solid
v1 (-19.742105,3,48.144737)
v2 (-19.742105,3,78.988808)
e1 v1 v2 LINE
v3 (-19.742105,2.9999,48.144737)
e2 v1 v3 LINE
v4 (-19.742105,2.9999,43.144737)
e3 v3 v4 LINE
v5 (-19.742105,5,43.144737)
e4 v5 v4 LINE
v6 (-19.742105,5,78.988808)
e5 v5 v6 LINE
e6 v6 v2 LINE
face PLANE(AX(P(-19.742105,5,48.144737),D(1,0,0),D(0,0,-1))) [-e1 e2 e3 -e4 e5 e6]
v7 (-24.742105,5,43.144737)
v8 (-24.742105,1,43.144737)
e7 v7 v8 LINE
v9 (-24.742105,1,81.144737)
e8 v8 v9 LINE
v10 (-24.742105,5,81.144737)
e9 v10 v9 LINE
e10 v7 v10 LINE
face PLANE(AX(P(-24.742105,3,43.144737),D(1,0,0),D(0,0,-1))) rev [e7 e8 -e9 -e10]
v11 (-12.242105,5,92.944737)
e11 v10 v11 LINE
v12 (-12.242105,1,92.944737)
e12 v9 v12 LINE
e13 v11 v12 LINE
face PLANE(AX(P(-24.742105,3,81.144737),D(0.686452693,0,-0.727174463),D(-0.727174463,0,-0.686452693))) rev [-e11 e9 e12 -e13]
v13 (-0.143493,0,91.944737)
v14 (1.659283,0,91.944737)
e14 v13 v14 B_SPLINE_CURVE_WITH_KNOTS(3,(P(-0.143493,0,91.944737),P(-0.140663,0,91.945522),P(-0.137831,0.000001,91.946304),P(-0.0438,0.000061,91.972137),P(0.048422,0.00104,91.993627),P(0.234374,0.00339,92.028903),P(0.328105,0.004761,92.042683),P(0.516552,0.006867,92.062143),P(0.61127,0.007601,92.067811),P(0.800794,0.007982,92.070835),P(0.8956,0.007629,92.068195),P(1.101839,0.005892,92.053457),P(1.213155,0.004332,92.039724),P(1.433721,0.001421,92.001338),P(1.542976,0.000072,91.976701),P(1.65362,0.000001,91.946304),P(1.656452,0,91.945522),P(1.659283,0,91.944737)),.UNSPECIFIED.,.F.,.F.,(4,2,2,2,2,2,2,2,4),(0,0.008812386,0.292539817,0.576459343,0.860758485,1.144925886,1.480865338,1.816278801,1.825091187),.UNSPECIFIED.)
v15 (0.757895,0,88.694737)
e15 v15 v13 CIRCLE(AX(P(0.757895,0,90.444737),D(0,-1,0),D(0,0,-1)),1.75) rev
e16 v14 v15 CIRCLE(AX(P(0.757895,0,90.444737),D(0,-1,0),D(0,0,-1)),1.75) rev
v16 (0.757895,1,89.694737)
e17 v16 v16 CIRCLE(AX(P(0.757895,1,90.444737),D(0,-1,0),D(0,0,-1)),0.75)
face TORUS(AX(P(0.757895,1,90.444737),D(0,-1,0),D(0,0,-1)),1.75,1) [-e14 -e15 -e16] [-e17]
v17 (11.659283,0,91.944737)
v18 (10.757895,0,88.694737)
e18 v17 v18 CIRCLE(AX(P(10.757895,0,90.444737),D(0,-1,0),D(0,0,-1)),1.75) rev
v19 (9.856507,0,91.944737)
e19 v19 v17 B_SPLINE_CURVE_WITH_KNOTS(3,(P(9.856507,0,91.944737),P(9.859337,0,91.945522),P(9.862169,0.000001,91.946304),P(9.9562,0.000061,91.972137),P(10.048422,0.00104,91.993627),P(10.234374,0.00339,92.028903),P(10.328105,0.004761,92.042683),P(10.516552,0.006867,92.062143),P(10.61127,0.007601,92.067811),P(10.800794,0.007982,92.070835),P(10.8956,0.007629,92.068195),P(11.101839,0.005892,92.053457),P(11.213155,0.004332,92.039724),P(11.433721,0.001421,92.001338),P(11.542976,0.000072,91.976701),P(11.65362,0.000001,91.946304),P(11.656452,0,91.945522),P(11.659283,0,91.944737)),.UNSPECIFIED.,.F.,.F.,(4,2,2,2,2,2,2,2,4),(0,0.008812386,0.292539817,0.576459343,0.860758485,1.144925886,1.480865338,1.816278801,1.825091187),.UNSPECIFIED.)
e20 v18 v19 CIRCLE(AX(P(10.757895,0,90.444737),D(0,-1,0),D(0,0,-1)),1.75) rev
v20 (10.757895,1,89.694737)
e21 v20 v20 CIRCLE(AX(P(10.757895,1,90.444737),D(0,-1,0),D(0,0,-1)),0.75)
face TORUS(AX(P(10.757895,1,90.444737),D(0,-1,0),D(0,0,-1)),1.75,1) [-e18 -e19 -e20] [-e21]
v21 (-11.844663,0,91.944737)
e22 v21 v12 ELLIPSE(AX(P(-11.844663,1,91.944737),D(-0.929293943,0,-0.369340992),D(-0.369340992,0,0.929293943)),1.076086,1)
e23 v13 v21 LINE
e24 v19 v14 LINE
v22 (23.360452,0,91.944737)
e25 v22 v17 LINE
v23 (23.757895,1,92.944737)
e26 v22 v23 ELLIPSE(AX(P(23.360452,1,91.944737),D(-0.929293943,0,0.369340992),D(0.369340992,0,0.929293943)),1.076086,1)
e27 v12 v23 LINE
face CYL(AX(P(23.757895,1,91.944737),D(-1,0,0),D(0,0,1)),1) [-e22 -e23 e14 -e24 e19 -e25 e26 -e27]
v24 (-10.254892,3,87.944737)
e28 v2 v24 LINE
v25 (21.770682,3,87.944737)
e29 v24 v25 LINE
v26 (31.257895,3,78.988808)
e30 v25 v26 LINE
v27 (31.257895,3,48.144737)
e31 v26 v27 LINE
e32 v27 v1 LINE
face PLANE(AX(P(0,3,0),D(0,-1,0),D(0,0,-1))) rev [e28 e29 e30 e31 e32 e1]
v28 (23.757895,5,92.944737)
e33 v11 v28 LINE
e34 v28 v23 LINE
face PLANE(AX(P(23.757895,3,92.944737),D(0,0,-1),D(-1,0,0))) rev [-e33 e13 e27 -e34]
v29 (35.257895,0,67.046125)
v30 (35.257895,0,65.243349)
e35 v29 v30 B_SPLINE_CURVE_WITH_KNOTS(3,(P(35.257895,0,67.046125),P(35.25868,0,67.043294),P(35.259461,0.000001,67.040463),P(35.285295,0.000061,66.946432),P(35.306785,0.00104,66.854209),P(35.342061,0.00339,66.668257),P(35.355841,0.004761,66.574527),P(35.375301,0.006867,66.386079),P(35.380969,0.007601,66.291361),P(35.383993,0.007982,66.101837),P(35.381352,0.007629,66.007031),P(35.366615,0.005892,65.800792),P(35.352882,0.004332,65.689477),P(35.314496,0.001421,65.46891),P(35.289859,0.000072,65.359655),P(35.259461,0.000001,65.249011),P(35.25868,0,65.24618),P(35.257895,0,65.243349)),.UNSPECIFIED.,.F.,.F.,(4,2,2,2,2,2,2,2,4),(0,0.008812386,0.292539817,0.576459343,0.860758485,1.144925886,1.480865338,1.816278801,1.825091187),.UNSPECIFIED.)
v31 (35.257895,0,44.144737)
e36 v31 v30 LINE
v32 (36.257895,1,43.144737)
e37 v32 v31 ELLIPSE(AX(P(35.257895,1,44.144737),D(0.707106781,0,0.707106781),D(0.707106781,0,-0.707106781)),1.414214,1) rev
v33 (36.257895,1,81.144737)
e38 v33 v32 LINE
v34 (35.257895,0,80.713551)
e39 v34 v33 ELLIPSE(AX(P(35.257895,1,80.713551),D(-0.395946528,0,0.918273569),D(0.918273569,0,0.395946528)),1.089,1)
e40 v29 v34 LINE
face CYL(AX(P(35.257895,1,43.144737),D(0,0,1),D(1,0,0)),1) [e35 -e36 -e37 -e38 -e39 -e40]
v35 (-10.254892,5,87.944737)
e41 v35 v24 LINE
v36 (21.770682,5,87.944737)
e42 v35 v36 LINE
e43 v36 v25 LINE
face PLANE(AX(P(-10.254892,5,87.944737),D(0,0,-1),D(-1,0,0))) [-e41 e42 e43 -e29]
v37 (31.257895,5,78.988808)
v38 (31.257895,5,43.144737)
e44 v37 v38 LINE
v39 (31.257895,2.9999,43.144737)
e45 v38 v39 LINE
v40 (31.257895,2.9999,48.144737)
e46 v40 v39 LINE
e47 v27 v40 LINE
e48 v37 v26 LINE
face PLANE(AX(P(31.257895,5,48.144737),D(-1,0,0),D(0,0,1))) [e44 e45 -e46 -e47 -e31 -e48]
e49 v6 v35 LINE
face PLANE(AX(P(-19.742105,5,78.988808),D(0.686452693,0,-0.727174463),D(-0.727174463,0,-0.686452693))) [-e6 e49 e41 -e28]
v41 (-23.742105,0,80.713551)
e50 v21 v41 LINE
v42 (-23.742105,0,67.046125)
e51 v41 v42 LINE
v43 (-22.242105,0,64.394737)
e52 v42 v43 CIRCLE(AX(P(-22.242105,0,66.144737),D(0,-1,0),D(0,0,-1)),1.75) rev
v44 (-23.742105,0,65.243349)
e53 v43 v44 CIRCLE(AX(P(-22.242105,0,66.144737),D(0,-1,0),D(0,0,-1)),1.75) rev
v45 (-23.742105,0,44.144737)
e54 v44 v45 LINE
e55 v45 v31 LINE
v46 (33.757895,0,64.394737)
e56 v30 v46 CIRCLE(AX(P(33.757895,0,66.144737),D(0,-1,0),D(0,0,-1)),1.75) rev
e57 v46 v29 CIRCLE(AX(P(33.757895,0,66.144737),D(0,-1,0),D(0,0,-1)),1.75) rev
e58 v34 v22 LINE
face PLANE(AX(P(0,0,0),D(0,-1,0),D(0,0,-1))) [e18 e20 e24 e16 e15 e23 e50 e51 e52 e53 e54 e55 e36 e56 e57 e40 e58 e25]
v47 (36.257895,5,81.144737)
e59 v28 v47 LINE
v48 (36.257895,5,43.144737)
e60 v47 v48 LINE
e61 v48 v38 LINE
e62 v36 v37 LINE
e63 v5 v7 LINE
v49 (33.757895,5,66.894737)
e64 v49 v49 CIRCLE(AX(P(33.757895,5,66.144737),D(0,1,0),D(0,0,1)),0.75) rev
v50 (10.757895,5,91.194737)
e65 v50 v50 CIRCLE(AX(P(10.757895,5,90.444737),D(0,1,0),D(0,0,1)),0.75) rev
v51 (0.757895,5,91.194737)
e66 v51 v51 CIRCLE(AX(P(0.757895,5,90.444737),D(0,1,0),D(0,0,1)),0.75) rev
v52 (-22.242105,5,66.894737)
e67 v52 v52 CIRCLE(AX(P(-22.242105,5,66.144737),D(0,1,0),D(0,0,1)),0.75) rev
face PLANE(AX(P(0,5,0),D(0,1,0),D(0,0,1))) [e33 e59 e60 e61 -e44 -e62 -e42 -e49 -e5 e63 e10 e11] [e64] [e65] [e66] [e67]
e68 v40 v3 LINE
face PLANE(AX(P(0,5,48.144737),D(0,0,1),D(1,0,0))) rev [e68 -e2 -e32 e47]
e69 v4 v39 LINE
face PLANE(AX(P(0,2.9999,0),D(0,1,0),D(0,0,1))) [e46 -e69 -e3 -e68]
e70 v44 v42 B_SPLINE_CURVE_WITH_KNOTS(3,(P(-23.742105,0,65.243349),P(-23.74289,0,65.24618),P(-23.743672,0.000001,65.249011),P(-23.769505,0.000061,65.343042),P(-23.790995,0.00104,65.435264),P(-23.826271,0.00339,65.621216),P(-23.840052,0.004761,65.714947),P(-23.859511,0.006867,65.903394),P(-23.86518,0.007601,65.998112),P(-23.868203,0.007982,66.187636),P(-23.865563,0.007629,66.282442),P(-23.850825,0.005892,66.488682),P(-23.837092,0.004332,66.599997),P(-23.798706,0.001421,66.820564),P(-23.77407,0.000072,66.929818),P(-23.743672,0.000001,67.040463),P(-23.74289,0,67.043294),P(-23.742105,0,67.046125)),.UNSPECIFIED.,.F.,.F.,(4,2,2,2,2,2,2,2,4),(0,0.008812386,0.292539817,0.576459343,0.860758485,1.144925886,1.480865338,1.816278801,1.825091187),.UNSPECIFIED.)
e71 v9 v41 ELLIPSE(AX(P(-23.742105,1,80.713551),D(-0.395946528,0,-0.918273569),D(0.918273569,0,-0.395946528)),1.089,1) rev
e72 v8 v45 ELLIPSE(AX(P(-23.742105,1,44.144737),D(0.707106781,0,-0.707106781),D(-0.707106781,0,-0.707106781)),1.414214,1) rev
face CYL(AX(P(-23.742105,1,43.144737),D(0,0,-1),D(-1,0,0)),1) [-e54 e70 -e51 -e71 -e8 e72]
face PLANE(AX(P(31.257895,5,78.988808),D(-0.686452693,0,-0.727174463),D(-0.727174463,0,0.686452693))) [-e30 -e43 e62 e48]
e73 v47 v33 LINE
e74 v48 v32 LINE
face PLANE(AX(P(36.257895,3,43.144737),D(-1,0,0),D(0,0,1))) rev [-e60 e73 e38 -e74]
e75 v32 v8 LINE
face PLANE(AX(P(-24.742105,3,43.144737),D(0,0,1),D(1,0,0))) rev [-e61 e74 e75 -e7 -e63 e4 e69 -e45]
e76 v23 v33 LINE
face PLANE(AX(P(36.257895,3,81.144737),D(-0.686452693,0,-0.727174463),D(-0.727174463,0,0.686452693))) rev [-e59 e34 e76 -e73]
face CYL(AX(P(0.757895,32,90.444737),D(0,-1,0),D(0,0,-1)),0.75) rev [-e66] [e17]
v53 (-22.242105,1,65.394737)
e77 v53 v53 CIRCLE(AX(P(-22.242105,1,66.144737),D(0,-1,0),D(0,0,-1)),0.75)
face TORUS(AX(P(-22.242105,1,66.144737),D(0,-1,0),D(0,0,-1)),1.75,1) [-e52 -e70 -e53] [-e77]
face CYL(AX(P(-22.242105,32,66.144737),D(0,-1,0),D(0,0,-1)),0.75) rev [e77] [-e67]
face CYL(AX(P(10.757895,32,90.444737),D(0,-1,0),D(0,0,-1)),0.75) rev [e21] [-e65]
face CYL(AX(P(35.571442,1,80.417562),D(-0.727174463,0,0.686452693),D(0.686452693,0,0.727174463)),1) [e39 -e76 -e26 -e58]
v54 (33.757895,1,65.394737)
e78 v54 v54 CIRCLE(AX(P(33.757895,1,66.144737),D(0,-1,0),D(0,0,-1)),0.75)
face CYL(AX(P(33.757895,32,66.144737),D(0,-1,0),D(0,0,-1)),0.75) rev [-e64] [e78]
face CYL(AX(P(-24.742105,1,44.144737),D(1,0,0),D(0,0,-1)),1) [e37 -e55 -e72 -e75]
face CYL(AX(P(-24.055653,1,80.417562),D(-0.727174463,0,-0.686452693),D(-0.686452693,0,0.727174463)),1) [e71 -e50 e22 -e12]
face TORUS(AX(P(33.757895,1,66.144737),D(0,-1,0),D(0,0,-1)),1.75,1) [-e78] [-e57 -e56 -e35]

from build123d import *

# Parameters (mm, degrees)
DODANIE_WYCI_GNI_CIE1_DEPTH       = 3
WYCI_GNI_CIE_CIENKA_CIANKA2_DEPTH = 2
WYTNIJ_WYCI_GNI_CIE1_DEPTH        = 27
WYTNIJ_WYCI_GNI_CIE1_DEPTH_BACK   = 40
SZKIC3_R                          = 0.75
ZAOKR_GLENIE2_R                   = 1
WYTNIJ_WYCI_GNI_CIE2_DEPTH        = 100.81161788
WYTNIJ_WYCI_GNI_CIE2_DEPTH_BACK   = 0.0001
SZKIC4_W                          = 51
SZKIC4_H                          = 5


with BuildPart() as part:
    # Szkic1 → Dodanie-wyciągnięcie1 (new body)
    with BuildSketch(Plane(origin=(0, 0, 0), x_dir=(1, 0, 0), z_dir=(0, 1, 0))):
        Polygon((-24.742105263, -43.144736842), (36.257894737, -43.144736842), (36.257894737, -81.144736842), (23.757894737, -92.944736842), (-12.242105263, -92.944736842), (-24.742105263, -81.144736842), align=None)
    extrude(amount=DODANIE_WYCI_GNI_CIE1_DEPTH)

    # Szkic2 → Wyciągnięcie-cienka ścianka2 (add)
    with BuildSketch(Plane(origin=(0, 3, 0), x_dir=(1, 0, 0), z_dir=(0, 1, 0))):
        Polygon((23.757894737, -92.944736842), (-12.242105263, -92.944736842), (-24.742105263, -81.144736842), (-24.742105263, -43.144736842), (36.257894737, -43.144736842), (36.257894737, -81.144736842), align=None)
        Polygon((21.770681783, -87.944736842), (-10.25489231, -87.944736842), (-19.742105263, -78.988807814), (-19.742105263, -48.144736842), (31.257894737, -48.144736842), (31.257894737, -78.988807814), align=None, mode=Mode.SUBTRACT)
    extrude(amount=WYCI_GNI_CIE_CIENKA_CIANKA2_DEPTH)

    # Szkic3 → Wytnij-wyciągnięcie1 (cut, two sides: drawn at the far end of the back side and taken through both)
    with BuildSketch(Plane(origin=(0, 5, 0), x_dir=(1, 0, 0), z_dir=(0, 1, 0)).offset(-WYTNIJ_WYCI_GNI_CIE1_DEPTH_BACK)):
        with Locations(Location((0.757894737, -90.444736842, 0), (0, 0, 90))):
            Circle(SZKIC3_R)
        with Locations(Location((10.757894737, -90.444736842, 0), (0, 0, 90))):
            Circle(SZKIC3_R)
        with Locations(Location((-22.242105263, -66.144736842, 0), (0, 0, 90))):
            Circle(SZKIC3_R)
        with Locations(Location((33.757894737, -66.144736842, 0), (0, 0, 90))):
            Circle(SZKIC3_R)
    extrude(amount=WYTNIJ_WYCI_GNI_CIE1_DEPTH + WYTNIJ_WYCI_GNI_CIE1_DEPTH_BACK, mode=Mode.SUBTRACT)

    # Zaokrąglenie2
    # the kernel refuses this fillet: 1 mm, written as the material it takes off along each edge
    with BuildSketch(Plane(origin=(33.757894737, 0, 66.144736842), x_dir=(0, 0, -1), z_dir=(1, 0, 0))) as zaokr_glenie2_piece_1:
        with BuildLine():
            CenterArc((0.75 + ZAOKR_GLENIE2_R, ZAOKR_GLENIE2_R), ZAOKR_GLENIE2_R, 180, 90)
            Line((0.75, ZAOKR_GLENIE2_R), (0.75, 0))
            Line((0.75, 0), (0.75 + ZAOKR_GLENIE2_R, 0))
        make_face()
    revolve(axis=Axis((33.757894737, 0, 66.144736842), (0, 1, 0)), mode=Mode.SUBTRACT)
    with BuildSketch(Plane(origin=(-22.242105263, 0, 66.144736842), x_dir=(0, 0, -1), z_dir=(1, 0, 0))) as zaokr_glenie2_piece_2:
        with BuildLine():
            CenterArc((0.75 + ZAOKR_GLENIE2_R, ZAOKR_GLENIE2_R), ZAOKR_GLENIE2_R, 180, 90)
            Line((0.75, ZAOKR_GLENIE2_R), (0.75, 0))
            Line((0.75, 0), (0.75 + ZAOKR_GLENIE2_R, 0))
        make_face()
    revolve(axis=Axis((-22.242105263, 0, 66.144736842), (0, 1, 0)), mode=Mode.SUBTRACT)
    with BuildSketch(Plane(origin=(-27.242105263, 0, 43.144736842), x_dir=(0, 1, 0), z_dir=(1, 0, 0))) as zaokr_glenie2_piece_3:
        with BuildLine():
            CenterArc((ZAOKR_GLENIE2_R, ZAOKR_GLENIE2_R), ZAOKR_GLENIE2_R, 180, 90)
            Line((0, ZAOKR_GLENIE2_R), (0, 0))
            Line((0, 0), (ZAOKR_GLENIE2_R, 0))
        make_face()
    extrude(amount=66, mode=Mode.SUBTRACT)
    with BuildSketch(Plane(origin=(10.757894737, 0, 90.444736842), x_dir=(0, 0, -1), z_dir=(1, 0, 0))) as zaokr_glenie2_piece_4:
        with BuildLine():
            CenterArc((0.75 + ZAOKR_GLENIE2_R, ZAOKR_GLENIE2_R), ZAOKR_GLENIE2_R, 180, 90)
            Line((0.75, ZAOKR_GLENIE2_R), (0.75, 0))
            Line((0.75, 0), (0.75 + ZAOKR_GLENIE2_R, 0))
        make_face()
    revolve(axis=Axis((10.757894737, 0, 90.444736842), (0, 1, 0)), mode=Mode.SUBTRACT)
    with BuildSketch(Plane(origin=(36.257894737, 0, 40.644736842), x_dir=(0, 1, 0), z_dir=(0, 0, 1)), Plane(origin=(-24.742105263, 0, 83.644736842), x_dir=(0, 1, 0), z_dir=(0, 0, -1))) as zaokr_glenie2_piece_5:
        with BuildLine():
            CenterArc((ZAOKR_GLENIE2_R, ZAOKR_GLENIE2_R), ZAOKR_GLENIE2_R, 180, 90)
            Line((0, ZAOKR_GLENIE2_R), (0, 0))
            Line((0, 0), (ZAOKR_GLENIE2_R, 0))
        make_face()
    extrude(amount=43, mode=Mode.SUBTRACT)
    with BuildSketch(Plane(origin=(0.757894737, 0, 90.444736842), x_dir=(0, 0, -1), z_dir=(1, 0, 0))) as zaokr_glenie2_piece_6:
        with BuildLine():
            CenterArc((0.75 + ZAOKR_GLENIE2_R, ZAOKR_GLENIE2_R), ZAOKR_GLENIE2_R, 180, 90)
            Line((0.75, ZAOKR_GLENIE2_R), (0.75, 0))
            Line((0.75, 0), (0.75 + ZAOKR_GLENIE2_R, 0))
        make_face()
    revolve(axis=Axis((0.757894737, 0, 90.444736842), (0, 1, 0)), mode=Mode.SUBTRACT)
    with BuildSketch(Plane(origin=(38.075830895, 0, 79.428605109), x_dir=(-0.6864526932555783, 0, -0.7271744631944682), z_dir=(-0.7271744631944682, 0, 0.6864526932555782)), Plane(origin=(-10.424169105, 0, 94.660868575), x_dir=(0.686452693255578, 0, -0.7271744631944684), z_dir=(-0.7271744631944684, 0, -0.686452693255578))) as zaokr_glenie2_piece_7:
        with BuildLine():
            CenterArc((ZAOKR_GLENIE2_R, -ZAOKR_GLENIE2_R), ZAOKR_GLENIE2_R, 90, 90)
            Line((0, -ZAOKR_GLENIE2_R), (0, 0))
            Line((0, 0), (ZAOKR_GLENIE2_R, 0))
        make_face()
    extrude(amount=22.18982257, mode=Mode.SUBTRACT)
    with BuildSketch(Plane(origin=(26.257894737, 0, 92.944736842), x_dir=(0, 0, -1), z_dir=(-1, 0, 0))) as zaokr_glenie2_piece_8:
        with BuildLine():
            CenterArc((ZAOKR_GLENIE2_R, -ZAOKR_GLENIE2_R), ZAOKR_GLENIE2_R, 90, 90)
            Line((0, -ZAOKR_GLENIE2_R), (0, 0))
            Line((0, 0), (ZAOKR_GLENIE2_R, 0))
        make_face()
    extrude(amount=41, mode=Mode.SUBTRACT)

    # Szkic4 → Wytnij-wyciągnięcie2 (cut, two sides: drawn at the far end of the back side and taken through both)
    with BuildSketch(Plane(origin=(0, 3, 0), x_dir=(1, 0, 0), z_dir=(0, 1, 0)).offset(-WYTNIJ_WYCI_GNI_CIE2_DEPTH_BACK)):
        with Locations((5.757894737, -45.644736842)):
            Rectangle(SZKIC4_W, SZKIC4_H)
    extrude(amount=WYTNIJ_WYCI_GNI_CIE2_DEPTH + WYTNIJ_WYCI_GNI_CIE2_DEPTH_BACK, mode=Mode.SUBTRACT)


solid = part.part
